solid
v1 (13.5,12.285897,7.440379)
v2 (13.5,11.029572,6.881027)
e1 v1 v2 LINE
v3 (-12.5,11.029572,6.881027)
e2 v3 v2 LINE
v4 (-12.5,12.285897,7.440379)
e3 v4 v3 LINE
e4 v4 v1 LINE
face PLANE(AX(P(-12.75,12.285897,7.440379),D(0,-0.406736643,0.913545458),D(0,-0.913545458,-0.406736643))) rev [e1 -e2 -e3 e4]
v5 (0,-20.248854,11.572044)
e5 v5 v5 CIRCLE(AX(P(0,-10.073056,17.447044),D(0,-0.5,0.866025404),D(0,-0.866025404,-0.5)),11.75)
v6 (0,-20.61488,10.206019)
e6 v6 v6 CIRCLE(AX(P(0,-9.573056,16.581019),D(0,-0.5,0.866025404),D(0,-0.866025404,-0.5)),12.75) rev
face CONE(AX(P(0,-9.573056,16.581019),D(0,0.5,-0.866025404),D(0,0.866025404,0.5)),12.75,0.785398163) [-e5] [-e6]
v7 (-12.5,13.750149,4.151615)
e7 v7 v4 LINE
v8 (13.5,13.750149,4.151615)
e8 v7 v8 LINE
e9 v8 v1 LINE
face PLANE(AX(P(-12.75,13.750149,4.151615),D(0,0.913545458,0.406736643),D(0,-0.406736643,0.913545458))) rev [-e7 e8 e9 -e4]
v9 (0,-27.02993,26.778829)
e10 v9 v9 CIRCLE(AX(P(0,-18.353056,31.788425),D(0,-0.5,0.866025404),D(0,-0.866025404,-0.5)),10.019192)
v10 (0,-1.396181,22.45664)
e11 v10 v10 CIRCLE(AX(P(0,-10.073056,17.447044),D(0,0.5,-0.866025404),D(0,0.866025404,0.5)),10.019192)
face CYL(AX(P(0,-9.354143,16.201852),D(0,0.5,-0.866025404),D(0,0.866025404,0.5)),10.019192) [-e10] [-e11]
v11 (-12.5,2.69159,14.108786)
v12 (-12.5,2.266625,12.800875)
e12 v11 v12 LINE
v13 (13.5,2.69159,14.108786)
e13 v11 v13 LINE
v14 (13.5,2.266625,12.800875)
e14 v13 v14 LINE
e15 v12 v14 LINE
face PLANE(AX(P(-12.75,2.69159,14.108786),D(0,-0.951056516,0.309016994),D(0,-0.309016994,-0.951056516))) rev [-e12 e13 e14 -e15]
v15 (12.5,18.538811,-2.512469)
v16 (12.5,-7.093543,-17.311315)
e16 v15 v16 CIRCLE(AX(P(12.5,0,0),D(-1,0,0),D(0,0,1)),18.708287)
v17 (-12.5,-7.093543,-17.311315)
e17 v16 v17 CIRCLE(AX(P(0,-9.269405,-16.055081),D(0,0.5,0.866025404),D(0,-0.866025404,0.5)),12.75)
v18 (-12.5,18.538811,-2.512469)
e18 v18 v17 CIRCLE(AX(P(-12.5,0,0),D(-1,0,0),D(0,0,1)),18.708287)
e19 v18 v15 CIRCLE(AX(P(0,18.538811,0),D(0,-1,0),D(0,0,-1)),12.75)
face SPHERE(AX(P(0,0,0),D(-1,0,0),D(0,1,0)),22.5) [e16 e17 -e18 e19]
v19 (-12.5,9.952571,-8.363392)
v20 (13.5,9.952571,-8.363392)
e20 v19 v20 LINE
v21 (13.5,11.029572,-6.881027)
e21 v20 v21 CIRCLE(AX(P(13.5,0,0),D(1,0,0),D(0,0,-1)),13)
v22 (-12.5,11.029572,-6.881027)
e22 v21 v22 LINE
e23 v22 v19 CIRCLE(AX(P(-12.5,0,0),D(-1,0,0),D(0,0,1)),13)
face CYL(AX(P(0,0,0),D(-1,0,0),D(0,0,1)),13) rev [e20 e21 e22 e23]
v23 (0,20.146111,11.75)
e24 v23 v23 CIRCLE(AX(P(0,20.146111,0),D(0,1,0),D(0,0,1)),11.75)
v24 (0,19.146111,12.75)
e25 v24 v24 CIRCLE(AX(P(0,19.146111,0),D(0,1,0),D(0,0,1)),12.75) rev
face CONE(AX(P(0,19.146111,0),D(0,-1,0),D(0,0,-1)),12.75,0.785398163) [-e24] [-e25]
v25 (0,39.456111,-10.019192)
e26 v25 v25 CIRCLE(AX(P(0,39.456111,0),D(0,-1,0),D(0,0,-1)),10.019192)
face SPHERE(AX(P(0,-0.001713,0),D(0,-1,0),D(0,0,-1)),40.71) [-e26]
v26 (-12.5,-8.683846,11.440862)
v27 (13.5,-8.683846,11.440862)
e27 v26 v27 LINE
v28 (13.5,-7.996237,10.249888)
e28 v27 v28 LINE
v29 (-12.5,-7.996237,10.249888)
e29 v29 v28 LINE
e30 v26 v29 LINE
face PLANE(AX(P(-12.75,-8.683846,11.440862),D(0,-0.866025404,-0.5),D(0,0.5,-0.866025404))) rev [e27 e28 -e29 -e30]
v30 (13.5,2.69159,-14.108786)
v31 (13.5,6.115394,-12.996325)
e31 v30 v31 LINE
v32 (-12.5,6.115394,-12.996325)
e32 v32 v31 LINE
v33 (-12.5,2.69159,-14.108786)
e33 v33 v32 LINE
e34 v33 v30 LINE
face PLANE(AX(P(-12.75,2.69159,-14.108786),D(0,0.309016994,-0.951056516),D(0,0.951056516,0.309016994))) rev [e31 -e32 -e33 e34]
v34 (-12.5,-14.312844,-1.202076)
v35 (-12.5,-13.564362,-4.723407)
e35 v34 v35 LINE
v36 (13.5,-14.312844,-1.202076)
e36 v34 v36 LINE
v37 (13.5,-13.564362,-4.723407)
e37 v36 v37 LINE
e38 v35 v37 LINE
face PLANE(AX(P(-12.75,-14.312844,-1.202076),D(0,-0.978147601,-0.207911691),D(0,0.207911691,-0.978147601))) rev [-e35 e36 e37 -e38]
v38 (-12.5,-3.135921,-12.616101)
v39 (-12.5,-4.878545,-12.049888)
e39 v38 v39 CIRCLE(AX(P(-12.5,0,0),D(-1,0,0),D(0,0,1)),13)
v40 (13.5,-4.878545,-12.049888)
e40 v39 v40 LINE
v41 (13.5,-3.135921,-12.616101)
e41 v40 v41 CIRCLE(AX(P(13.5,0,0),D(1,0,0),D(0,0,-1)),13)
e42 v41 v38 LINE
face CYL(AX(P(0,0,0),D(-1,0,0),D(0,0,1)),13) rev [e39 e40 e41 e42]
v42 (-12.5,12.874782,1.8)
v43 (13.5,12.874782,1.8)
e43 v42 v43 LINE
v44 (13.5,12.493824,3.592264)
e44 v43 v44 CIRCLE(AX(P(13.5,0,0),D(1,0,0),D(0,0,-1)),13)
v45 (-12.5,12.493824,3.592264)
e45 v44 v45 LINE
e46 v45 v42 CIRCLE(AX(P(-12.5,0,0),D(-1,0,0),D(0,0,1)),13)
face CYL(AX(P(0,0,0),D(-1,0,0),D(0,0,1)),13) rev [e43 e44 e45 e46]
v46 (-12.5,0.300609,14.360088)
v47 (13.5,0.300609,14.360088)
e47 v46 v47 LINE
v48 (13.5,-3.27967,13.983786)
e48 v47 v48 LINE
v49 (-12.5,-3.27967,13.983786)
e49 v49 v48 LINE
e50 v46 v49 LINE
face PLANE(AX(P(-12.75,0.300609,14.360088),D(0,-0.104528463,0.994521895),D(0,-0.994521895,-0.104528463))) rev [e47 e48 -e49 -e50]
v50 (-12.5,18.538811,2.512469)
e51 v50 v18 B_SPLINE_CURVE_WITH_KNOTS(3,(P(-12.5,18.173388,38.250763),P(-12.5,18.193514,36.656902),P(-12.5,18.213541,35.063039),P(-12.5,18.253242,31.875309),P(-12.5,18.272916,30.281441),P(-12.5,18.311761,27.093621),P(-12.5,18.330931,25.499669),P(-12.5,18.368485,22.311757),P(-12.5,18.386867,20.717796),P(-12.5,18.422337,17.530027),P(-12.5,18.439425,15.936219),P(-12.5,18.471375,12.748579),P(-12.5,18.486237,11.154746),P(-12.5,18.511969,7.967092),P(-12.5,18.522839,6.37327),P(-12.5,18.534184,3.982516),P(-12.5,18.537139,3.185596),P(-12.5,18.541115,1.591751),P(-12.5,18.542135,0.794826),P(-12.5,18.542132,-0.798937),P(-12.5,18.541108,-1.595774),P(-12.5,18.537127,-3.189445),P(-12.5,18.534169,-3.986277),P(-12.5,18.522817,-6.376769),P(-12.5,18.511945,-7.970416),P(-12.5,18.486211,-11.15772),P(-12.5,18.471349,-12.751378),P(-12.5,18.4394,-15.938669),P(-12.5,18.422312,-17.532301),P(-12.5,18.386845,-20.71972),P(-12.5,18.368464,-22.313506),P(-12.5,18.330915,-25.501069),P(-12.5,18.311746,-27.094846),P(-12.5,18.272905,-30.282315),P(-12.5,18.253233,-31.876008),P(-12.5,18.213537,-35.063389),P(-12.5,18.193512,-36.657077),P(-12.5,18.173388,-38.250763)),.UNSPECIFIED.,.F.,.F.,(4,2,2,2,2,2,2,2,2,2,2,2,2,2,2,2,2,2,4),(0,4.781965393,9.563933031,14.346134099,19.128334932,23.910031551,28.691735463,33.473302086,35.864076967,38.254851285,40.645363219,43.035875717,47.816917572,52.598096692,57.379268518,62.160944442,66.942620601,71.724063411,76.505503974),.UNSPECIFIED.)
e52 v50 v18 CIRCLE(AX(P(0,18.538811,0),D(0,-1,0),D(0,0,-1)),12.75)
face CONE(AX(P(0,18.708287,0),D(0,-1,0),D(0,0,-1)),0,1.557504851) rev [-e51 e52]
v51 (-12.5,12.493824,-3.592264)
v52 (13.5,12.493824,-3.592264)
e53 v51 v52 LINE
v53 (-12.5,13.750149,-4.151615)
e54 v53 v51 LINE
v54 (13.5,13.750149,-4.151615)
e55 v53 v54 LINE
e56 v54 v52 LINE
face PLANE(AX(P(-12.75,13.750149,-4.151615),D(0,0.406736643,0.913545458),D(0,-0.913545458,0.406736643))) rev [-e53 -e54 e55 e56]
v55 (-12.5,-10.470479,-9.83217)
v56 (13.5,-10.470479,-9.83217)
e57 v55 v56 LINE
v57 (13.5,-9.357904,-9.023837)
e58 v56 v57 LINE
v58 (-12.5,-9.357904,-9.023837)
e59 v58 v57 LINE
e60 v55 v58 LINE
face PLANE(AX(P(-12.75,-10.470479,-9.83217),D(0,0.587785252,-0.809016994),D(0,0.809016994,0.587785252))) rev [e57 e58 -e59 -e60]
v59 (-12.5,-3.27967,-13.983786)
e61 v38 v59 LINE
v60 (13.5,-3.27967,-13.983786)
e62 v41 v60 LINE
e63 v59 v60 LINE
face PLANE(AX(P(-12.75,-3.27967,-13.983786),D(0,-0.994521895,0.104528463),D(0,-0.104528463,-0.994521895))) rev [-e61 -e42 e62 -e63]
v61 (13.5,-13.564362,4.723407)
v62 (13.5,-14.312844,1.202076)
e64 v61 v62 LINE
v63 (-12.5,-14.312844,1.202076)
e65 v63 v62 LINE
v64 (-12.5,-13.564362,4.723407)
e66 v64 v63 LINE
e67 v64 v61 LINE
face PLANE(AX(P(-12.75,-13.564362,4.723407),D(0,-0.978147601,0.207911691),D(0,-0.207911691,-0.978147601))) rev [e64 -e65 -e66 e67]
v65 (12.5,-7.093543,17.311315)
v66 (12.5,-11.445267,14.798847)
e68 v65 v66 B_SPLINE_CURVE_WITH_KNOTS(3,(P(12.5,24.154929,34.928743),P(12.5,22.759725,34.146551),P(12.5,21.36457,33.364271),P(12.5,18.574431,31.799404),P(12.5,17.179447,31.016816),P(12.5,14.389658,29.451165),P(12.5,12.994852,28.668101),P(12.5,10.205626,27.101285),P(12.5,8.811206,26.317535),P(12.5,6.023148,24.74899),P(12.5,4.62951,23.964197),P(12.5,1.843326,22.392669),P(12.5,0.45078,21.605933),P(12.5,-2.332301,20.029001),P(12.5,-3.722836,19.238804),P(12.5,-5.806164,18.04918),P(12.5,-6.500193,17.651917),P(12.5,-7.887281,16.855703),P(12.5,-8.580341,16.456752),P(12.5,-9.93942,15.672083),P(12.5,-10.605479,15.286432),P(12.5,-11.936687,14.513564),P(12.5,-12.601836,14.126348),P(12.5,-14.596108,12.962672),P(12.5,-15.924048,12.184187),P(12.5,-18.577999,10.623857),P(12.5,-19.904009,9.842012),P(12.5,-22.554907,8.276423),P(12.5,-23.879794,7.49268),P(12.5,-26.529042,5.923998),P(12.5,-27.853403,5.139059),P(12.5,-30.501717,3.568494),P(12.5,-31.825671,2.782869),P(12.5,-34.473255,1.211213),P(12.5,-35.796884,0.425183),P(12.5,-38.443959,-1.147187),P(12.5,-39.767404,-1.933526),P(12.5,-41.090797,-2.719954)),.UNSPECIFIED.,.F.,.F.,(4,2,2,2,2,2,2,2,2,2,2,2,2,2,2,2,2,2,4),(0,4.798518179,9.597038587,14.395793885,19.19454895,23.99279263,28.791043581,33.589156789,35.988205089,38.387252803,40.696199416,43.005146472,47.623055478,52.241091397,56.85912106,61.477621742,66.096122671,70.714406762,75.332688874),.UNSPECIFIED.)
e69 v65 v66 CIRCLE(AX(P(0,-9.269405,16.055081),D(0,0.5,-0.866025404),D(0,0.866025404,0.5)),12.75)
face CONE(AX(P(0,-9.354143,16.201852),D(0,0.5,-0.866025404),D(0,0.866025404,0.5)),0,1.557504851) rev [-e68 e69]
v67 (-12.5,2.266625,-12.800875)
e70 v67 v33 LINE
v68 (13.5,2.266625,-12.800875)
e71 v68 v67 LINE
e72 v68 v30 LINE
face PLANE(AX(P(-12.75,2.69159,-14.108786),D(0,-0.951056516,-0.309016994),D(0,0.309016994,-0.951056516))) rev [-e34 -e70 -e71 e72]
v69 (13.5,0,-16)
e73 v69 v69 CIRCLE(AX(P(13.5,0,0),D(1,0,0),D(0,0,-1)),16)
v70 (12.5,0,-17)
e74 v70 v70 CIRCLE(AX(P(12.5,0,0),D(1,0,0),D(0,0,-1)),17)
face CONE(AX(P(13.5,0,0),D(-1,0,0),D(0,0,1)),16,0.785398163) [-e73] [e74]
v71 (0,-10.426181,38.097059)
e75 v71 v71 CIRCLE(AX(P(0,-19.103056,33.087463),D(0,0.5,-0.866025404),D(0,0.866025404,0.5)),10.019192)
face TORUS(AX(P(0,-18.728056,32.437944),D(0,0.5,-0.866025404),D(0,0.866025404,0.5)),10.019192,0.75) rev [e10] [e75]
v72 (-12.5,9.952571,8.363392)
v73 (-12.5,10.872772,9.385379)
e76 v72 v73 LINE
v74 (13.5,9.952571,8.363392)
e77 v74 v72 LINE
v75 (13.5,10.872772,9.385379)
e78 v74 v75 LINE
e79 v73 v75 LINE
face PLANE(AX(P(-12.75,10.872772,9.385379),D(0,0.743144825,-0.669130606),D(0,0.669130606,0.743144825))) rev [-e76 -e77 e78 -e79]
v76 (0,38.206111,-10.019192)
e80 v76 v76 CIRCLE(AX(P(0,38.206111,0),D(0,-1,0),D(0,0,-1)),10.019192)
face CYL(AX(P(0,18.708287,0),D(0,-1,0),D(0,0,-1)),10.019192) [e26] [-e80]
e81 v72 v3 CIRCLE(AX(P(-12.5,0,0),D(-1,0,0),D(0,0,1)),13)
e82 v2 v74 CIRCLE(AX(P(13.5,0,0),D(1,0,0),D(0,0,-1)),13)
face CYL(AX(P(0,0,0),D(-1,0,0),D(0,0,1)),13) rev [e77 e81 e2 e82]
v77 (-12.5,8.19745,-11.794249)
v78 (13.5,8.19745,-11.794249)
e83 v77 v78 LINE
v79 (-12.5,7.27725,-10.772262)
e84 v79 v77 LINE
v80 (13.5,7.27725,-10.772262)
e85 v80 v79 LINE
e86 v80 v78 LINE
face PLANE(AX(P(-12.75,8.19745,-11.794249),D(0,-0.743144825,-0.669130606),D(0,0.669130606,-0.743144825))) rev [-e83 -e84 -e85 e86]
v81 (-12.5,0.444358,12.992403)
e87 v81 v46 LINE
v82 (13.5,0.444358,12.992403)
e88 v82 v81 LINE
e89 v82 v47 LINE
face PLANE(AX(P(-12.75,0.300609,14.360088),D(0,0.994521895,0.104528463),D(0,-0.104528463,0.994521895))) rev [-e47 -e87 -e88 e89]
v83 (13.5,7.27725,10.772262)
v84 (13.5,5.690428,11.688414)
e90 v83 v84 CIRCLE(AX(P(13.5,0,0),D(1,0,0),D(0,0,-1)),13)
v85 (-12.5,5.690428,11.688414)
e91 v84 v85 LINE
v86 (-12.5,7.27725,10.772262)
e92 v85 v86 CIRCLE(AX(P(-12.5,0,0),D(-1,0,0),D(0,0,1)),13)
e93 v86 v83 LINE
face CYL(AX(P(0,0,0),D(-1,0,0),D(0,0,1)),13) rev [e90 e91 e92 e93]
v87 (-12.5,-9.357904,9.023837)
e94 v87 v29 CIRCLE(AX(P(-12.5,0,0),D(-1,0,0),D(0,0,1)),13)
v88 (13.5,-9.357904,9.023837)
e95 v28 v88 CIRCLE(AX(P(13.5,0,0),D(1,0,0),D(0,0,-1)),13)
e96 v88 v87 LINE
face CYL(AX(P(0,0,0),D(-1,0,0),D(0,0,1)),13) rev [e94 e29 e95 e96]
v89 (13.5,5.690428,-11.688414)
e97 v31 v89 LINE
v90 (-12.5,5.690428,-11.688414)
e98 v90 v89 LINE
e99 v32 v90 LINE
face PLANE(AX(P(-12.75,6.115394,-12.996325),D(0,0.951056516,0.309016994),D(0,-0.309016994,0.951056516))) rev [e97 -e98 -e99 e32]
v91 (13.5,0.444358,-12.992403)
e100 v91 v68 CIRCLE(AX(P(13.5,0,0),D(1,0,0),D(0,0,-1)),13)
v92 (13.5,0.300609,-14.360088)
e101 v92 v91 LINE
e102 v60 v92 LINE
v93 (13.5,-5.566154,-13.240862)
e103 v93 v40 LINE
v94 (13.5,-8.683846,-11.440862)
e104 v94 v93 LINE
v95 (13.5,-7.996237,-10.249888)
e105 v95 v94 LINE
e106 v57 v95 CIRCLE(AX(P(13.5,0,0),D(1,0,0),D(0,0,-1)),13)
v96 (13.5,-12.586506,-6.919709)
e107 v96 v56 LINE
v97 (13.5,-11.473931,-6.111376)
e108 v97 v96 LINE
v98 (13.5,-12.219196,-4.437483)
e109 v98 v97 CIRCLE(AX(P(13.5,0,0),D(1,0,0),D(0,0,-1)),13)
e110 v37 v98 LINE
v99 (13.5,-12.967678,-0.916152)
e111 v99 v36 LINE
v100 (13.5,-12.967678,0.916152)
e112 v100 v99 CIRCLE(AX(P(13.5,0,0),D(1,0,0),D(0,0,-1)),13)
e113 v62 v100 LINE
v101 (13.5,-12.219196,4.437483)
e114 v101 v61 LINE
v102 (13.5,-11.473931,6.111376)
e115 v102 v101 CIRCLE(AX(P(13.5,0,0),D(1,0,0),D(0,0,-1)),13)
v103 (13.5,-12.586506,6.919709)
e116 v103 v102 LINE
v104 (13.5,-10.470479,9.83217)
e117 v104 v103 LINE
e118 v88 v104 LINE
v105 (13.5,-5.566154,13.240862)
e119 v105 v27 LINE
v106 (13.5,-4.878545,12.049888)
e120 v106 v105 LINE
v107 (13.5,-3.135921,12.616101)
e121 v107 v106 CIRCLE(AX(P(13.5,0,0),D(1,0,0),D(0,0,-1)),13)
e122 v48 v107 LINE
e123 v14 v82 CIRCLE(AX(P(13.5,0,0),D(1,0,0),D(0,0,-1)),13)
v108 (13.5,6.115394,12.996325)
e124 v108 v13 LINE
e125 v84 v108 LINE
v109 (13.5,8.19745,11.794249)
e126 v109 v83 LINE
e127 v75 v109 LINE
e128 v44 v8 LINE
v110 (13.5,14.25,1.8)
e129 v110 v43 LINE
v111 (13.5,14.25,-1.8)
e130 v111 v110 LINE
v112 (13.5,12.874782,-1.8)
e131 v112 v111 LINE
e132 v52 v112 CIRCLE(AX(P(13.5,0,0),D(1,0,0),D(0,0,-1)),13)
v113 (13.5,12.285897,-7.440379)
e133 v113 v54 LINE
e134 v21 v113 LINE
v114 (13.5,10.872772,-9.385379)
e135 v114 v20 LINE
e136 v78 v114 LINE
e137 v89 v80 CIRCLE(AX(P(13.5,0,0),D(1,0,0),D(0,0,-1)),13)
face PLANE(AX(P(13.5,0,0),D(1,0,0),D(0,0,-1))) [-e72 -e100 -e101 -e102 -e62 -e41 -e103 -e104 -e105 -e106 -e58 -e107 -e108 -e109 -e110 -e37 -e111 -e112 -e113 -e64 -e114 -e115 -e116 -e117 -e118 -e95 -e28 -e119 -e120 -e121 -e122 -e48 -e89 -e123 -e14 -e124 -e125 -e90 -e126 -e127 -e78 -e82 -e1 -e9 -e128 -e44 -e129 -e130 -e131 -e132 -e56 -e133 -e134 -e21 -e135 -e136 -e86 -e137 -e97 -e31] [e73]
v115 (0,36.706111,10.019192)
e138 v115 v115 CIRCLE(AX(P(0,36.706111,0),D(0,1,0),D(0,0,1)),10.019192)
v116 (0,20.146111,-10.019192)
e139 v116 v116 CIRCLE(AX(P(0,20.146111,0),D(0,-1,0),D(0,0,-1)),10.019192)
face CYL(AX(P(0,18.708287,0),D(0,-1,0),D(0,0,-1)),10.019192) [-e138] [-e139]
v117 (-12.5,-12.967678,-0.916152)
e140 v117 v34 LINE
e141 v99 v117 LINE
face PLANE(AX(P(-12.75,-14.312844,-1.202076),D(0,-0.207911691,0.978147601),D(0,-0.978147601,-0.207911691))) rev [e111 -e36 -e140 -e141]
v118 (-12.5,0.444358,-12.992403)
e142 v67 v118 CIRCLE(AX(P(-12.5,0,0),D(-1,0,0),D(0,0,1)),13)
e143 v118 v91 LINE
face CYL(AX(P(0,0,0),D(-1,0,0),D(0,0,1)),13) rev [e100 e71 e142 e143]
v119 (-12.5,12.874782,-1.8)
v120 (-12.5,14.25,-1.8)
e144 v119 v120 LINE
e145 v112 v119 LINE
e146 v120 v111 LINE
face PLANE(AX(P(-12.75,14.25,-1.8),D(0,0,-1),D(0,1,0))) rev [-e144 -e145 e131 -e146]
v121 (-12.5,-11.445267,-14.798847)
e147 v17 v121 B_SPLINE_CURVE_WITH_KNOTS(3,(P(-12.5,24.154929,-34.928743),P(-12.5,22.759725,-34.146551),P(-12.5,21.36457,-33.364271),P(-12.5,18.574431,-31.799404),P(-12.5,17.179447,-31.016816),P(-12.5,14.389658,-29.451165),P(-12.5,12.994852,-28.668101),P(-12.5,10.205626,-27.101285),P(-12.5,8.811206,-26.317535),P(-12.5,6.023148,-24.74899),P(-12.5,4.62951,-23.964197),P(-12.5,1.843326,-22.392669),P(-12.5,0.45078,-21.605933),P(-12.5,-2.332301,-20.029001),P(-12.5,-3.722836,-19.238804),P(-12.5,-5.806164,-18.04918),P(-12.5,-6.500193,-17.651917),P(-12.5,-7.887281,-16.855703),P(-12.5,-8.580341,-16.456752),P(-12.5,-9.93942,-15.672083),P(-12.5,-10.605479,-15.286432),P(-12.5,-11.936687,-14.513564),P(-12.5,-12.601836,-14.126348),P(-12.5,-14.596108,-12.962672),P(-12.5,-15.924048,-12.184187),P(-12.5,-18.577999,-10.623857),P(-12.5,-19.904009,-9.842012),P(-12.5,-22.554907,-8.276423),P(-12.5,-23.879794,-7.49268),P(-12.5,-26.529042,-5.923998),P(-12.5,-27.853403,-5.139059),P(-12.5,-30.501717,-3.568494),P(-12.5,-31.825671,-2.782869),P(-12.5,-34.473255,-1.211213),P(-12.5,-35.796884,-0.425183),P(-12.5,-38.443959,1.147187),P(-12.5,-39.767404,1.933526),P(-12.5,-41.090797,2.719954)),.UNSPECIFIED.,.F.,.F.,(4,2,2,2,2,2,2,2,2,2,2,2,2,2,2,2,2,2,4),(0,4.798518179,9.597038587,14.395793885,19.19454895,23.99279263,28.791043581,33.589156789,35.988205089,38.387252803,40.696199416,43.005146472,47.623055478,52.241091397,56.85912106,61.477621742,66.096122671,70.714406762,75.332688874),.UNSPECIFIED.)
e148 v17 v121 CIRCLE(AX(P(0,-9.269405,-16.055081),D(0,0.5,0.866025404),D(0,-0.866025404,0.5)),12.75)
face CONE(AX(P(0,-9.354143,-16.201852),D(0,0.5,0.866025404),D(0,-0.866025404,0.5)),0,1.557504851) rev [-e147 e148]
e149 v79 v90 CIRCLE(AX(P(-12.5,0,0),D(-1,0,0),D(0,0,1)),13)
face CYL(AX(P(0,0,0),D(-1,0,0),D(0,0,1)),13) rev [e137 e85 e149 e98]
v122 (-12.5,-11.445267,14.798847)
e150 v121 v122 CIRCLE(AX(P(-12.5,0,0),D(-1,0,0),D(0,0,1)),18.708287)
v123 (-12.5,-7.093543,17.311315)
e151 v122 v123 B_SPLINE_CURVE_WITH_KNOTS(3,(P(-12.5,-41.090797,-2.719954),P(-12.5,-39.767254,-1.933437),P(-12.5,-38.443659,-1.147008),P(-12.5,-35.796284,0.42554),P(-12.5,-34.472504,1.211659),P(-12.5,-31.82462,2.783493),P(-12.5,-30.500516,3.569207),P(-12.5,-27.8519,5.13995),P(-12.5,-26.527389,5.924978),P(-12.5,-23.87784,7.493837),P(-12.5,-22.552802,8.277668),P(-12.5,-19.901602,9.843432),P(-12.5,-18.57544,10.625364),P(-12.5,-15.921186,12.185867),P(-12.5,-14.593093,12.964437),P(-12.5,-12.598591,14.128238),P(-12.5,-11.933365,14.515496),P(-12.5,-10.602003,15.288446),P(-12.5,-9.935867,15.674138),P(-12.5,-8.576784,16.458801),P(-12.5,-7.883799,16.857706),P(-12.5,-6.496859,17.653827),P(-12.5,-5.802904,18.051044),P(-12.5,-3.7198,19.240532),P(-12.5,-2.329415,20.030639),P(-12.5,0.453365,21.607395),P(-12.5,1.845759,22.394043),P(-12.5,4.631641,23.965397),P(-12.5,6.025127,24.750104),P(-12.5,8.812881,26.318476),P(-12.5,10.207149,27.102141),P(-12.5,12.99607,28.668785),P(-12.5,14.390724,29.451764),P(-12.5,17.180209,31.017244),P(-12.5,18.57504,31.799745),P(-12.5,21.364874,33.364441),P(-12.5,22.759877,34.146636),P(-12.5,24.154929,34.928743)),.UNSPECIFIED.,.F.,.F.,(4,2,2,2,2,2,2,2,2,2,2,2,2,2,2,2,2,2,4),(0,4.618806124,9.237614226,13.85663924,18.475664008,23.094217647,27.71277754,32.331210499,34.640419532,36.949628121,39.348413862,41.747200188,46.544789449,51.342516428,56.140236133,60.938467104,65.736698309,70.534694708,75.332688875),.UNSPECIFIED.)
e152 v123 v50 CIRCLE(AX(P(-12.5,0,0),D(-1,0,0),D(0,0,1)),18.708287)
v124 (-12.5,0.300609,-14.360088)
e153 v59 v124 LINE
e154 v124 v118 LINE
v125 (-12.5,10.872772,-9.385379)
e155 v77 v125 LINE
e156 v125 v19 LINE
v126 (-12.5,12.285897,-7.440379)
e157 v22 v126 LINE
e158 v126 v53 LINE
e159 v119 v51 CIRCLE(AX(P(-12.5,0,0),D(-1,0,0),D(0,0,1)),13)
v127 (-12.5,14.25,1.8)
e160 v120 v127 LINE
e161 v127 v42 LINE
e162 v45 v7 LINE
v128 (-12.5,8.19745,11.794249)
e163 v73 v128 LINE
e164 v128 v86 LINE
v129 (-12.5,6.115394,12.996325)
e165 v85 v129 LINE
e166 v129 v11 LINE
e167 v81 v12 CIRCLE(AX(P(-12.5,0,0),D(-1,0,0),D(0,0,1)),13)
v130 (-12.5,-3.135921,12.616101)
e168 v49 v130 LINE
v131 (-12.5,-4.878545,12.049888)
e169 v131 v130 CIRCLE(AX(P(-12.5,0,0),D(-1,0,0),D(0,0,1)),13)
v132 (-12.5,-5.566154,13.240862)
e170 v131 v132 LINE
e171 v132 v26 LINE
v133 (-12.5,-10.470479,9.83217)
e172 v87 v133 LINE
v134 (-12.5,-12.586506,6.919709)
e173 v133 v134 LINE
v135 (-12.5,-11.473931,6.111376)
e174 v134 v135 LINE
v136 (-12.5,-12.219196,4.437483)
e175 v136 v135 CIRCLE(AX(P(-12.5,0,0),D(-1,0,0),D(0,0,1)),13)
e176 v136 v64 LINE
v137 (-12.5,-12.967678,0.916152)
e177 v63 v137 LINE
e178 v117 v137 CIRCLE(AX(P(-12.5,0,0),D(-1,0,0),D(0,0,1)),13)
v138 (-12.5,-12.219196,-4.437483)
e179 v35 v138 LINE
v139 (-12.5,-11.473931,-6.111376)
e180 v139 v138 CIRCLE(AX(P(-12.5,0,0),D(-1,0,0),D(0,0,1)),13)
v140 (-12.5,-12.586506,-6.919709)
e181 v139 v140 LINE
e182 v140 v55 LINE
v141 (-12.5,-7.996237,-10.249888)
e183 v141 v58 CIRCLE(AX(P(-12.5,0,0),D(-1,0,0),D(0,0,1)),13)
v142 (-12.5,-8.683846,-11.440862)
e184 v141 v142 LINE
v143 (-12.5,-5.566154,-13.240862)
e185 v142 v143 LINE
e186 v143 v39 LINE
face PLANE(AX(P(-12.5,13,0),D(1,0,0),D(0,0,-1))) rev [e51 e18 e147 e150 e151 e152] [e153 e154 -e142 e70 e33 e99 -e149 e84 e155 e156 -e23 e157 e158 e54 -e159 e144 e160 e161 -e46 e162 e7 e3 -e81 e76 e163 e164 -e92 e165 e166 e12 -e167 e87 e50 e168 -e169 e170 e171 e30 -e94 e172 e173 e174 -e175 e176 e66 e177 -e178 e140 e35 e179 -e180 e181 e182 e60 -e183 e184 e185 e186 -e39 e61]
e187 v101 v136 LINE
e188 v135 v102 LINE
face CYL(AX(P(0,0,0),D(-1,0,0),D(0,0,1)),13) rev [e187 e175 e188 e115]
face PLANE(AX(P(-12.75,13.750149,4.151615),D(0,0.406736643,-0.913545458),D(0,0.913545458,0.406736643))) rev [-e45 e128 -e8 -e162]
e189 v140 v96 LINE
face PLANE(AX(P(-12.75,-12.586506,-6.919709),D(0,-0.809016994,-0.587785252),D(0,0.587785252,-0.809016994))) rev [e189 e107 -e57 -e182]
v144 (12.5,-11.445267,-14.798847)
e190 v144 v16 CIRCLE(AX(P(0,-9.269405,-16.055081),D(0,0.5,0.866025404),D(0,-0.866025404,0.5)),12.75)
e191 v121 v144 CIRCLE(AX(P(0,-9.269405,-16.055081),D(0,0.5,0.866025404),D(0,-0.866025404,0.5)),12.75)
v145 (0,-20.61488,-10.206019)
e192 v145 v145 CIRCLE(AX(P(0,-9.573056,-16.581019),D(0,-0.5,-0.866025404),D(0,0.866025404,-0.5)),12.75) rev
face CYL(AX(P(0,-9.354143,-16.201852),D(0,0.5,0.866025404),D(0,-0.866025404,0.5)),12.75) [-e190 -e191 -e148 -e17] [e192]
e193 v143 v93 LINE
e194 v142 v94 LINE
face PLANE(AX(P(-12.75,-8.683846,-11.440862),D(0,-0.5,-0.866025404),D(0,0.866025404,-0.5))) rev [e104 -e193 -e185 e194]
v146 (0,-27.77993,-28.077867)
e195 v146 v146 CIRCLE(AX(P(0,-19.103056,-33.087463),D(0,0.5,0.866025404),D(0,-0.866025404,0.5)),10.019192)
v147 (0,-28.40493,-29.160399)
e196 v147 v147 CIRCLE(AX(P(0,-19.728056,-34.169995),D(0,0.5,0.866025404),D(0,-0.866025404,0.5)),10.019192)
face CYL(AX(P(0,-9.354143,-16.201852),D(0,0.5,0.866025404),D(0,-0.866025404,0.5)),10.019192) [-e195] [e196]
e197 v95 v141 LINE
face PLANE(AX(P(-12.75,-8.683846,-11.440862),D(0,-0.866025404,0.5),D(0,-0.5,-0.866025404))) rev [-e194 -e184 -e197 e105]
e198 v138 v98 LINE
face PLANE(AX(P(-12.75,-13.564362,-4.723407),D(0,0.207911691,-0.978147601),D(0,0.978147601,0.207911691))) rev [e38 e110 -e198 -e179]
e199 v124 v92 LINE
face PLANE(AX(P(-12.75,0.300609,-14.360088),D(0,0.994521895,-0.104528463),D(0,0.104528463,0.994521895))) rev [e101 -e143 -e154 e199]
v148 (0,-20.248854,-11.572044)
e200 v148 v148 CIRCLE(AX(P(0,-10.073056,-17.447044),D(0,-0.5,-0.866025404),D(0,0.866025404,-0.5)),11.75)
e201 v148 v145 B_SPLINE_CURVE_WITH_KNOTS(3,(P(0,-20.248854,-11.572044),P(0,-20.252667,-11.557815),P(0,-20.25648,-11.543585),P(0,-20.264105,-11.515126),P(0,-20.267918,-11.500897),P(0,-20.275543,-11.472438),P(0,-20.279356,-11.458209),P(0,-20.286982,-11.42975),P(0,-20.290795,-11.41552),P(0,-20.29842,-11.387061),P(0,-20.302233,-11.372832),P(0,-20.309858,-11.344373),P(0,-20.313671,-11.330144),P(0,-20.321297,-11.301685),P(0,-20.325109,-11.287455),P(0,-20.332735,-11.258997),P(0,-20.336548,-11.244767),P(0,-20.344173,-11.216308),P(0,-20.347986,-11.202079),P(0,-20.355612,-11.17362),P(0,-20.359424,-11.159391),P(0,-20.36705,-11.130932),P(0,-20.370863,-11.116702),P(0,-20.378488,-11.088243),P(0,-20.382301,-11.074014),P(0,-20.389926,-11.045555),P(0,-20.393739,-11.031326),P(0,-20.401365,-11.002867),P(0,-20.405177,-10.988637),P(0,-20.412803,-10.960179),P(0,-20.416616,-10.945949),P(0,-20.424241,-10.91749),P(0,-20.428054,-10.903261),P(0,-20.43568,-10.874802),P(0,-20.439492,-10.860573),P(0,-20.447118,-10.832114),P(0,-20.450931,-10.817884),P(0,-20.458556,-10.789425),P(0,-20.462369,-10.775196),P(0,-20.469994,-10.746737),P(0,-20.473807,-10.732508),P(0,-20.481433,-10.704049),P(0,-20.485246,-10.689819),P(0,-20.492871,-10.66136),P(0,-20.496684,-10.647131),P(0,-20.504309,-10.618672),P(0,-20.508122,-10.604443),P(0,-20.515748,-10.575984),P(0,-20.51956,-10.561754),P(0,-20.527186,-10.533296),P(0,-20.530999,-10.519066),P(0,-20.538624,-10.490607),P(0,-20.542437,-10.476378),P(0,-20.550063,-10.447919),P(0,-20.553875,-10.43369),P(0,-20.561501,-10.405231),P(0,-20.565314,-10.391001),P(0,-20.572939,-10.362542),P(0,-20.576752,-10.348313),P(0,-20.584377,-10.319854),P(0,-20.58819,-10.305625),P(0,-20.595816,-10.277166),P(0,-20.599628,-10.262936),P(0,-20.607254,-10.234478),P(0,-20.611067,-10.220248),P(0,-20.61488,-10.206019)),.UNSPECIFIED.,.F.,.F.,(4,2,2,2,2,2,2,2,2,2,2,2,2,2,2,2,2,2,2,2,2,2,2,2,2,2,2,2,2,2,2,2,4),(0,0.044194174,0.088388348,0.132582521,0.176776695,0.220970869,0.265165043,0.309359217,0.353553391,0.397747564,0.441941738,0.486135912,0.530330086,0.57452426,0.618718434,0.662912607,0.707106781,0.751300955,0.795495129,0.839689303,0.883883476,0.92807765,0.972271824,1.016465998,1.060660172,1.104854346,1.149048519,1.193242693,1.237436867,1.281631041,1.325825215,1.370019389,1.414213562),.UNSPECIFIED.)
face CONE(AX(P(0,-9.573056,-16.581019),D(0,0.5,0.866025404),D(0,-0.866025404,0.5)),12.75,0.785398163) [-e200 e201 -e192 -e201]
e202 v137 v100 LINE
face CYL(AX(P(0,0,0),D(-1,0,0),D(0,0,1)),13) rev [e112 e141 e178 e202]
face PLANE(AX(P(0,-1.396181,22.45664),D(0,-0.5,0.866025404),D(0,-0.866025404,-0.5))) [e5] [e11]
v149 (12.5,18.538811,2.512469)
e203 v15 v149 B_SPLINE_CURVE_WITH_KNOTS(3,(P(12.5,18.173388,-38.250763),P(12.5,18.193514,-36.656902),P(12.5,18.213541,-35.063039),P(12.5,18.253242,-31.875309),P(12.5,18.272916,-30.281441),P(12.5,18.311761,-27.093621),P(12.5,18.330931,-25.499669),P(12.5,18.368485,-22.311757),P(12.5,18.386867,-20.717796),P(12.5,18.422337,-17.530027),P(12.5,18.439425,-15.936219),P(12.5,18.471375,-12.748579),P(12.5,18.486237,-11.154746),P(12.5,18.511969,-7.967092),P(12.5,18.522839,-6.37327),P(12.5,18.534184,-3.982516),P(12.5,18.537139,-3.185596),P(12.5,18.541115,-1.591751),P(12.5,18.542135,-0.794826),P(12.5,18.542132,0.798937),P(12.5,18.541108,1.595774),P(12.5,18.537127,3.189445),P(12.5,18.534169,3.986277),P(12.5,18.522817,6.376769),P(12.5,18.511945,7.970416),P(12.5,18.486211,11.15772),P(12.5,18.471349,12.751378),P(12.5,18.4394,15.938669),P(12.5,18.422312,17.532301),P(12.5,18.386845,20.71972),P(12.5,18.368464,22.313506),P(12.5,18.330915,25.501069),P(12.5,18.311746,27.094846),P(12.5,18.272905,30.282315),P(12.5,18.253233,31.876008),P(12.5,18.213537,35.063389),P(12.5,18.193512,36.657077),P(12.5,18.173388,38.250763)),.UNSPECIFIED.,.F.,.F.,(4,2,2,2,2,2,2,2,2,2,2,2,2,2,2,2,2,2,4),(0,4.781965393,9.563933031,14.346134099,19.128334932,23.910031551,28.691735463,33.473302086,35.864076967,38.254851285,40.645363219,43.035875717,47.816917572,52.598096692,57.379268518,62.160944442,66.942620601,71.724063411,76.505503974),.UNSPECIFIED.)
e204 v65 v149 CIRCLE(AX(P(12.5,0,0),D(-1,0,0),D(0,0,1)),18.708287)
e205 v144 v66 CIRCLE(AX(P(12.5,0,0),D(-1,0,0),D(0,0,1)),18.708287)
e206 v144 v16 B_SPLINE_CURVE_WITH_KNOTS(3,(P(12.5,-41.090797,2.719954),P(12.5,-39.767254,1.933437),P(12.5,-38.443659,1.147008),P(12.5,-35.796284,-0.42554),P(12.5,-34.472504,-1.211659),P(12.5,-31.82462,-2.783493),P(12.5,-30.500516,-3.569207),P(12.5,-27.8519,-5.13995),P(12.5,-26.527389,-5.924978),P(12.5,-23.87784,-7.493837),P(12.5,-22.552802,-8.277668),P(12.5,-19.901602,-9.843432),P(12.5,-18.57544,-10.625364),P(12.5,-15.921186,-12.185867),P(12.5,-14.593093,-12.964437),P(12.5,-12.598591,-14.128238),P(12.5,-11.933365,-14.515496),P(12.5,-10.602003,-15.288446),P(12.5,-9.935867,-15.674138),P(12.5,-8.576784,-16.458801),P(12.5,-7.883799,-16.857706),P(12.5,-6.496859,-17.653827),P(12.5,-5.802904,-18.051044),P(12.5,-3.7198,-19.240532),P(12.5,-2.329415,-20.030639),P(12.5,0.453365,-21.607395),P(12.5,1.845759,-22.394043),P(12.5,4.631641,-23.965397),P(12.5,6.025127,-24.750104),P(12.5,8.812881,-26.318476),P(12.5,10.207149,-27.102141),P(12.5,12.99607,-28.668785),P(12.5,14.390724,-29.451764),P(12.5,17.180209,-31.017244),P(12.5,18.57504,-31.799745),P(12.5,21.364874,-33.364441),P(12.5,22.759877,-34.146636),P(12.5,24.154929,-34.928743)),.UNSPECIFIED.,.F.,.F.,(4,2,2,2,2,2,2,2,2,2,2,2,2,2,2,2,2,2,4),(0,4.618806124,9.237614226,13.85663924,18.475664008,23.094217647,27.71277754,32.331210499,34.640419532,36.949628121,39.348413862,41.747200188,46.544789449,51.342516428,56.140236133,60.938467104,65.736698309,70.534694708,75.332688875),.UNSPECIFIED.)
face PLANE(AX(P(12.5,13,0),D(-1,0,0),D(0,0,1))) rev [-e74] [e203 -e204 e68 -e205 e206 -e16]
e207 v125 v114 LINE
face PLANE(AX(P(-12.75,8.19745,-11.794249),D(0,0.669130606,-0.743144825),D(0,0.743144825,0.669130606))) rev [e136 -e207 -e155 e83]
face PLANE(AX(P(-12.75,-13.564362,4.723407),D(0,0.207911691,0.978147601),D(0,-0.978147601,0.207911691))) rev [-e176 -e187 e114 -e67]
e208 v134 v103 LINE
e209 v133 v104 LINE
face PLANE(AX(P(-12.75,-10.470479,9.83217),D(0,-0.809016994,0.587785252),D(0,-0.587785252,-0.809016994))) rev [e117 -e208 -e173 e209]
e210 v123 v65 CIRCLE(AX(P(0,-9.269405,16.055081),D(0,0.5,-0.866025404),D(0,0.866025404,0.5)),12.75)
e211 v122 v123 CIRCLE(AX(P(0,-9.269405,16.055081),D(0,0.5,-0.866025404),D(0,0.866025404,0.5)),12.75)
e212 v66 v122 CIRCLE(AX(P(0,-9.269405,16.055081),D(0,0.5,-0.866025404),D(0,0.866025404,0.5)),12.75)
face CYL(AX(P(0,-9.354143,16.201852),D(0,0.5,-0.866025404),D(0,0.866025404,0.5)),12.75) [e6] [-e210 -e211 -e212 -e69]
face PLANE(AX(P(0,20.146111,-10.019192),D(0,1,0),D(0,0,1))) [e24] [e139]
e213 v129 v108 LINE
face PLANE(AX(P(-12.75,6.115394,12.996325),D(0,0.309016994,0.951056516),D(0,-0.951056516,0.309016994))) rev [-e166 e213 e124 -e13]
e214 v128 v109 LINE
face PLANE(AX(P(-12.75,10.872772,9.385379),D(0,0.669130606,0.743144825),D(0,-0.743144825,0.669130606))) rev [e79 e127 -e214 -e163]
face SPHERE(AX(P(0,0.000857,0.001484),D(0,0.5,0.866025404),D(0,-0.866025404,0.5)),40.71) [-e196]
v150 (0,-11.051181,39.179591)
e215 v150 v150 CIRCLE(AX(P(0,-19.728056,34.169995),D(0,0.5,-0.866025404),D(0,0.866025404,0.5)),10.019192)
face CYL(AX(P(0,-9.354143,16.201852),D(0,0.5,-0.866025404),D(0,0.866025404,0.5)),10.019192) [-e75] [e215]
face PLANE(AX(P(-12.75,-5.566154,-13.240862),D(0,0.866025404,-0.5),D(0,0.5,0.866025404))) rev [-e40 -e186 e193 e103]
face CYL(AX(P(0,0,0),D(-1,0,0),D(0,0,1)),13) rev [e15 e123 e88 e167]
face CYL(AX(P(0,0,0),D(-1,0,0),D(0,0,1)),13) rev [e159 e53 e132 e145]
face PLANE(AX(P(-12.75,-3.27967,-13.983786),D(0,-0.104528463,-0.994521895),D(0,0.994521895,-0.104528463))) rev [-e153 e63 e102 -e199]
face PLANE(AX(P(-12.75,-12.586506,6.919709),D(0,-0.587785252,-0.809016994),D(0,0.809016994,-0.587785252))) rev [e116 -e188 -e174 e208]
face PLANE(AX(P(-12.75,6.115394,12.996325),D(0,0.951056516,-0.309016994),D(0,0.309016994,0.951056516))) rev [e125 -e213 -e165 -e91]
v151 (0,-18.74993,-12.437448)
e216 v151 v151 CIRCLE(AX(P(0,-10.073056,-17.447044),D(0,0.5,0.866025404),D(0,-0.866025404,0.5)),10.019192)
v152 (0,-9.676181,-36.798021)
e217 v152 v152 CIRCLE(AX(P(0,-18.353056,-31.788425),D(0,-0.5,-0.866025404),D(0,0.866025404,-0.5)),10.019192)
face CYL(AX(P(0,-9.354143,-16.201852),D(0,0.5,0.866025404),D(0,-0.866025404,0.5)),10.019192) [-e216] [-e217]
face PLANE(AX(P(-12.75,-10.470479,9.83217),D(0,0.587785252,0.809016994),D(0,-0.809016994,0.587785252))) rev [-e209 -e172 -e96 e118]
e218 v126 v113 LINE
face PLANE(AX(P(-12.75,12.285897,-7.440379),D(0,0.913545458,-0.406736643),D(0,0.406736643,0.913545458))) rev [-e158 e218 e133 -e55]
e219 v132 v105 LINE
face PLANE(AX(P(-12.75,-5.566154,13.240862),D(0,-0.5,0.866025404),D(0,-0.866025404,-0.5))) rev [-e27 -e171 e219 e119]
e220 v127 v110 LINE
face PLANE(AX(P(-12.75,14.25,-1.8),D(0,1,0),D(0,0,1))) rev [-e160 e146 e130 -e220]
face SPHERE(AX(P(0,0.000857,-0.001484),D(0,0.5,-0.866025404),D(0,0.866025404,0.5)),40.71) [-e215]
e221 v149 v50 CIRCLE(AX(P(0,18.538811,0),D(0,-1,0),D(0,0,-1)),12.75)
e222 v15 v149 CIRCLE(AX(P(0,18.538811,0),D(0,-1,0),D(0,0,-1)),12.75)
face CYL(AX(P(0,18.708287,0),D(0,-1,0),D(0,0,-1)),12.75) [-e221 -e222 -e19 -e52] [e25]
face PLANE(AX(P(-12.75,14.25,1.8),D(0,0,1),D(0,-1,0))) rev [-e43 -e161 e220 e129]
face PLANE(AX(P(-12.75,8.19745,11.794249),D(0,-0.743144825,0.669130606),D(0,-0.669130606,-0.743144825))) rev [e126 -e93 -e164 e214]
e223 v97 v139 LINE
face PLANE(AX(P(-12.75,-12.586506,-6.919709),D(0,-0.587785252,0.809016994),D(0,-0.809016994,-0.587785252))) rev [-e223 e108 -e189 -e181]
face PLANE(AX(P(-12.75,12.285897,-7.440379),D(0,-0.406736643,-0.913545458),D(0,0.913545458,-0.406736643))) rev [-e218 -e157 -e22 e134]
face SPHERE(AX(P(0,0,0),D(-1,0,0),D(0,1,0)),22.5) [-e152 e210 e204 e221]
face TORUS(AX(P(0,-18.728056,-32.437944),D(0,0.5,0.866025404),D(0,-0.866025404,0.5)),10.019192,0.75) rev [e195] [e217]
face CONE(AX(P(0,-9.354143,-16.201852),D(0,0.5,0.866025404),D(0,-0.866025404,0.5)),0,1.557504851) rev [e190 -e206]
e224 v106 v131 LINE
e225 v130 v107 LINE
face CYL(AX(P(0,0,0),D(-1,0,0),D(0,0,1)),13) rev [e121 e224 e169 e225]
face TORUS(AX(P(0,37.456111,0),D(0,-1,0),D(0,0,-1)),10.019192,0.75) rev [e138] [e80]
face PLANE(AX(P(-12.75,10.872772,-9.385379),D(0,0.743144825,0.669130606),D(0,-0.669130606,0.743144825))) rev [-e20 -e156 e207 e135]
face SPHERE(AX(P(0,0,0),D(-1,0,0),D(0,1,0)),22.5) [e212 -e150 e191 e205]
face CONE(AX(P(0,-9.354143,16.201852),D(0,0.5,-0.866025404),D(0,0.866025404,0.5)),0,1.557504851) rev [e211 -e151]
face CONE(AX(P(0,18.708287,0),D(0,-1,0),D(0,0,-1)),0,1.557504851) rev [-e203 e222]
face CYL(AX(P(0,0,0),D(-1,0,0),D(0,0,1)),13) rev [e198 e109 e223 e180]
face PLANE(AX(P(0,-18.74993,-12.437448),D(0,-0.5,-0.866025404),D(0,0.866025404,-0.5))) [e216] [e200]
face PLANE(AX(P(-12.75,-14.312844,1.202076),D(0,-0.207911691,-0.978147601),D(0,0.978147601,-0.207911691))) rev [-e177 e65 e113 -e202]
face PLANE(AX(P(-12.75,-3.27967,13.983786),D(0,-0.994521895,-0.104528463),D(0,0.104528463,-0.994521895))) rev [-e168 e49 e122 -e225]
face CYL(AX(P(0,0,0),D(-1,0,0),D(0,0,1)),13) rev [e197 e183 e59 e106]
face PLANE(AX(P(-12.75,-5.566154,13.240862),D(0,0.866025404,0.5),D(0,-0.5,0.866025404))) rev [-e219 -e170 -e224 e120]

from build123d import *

# Parameters (mm, degrees)
BOSS_EXTRUDE1_START          = 1
SKETCH3_R                    = 17
SKETCH3_R_2                  = 13
BOSS_EXTRUDE1_DEPTH          = 1
CHAMFER1_SIZE                = 1
CHAMFER2_SIZE                = 1
SKETCH8_R                    = 0.75
CIRPATTERN2_COUNT            = 3
CHAMFER2_OF_CIRPATTERN2_SIZE = 1
SKETCH9_W                    = 3.6
SKETCH9_H                    = 2
CUT_EXTRUDE1_DEPTH           = 63.299818922
CIRPATTERN3_COUNT            = 15


with BuildPart() as part:
    # Sketch1 → Revolve1 (revolve)
    with BuildSketch(Plane.XY, mode=Mode.PRIVATE) as revolve1_sk:
        with BuildLine():
            Line((12.5, 13), (12.5, 18.708286934))
            ThreePointArc((12.5, 18.708286934), (0, 22.5), (-12.5, 18.708286934))
            Line((-12.5, 18.708286934), (-12.5, 13))
            Line((-12.5, 13), (12.5, 13))
        make_face()
    revolve(revolve1_sk.sketch.rotate(Axis((0, 0, 0), (1, 0, 0)), 90), axis=Axis((0, 0, 0), (1, 0, 0)))

    # Sketch3 → Boss-Extrude1 (add)
    with BuildSketch(Plane(origin=(12.5, 0, 0), x_dir=(0, 0, -1), z_dir=(1, 0, 0)).offset(BOSS_EXTRUDE1_START)):
        Circle(SKETCH3_R)
        with Locations(Location((0, 0, 0), (0, 0, 180))):
            Circle(SKETCH3_R_2, mode=Mode.SUBTRACT)
    extrude(amount=-BOSS_EXTRUDE1_DEPTH)

    # Chamfer1
    chamfer1_edges = [part.edges().sort_by_distance(p)[0] for p in [
        (13.5, 0, 17),
    ]]
    chamfer(chamfer1_edges, length=CHAMFER1_SIZE - 0.0001)  # a hair under: the kernel refuses the full size

    # Sketch7 → Revolve2 (revolve)
    with BuildSketch(Plane(origin=(0, 0, 0), x_dir=(0, 0, -1), z_dir=(1, 0, 0))):
        with BuildLine():
            Line((0, 18.708286934), (0, 40.708286934))
            ThreePointArc((0, 40.708286934), (5.048567788, 40.394030067), (10.019191725, 39.456111217))
            Line((10.019191725, 39.456111217), (10.019191725, 20.146111217))
            Line((10.019191725, 20.146111217), (12.75, 20.146111217))
            Line((12.75, 20.146111217), (12.75, 18.538810641))
            Line((12.75, 18.538810641), (0, 18.708286934))
        make_face()
    revolve2 = revolve(axis=Axis((0, 18.708286934, 0), (0, 1, 0)))

    # Chamfer2
    chamfer2_edges = [part.edges().sort_by_distance(p)[0] for p in [
        (0, 20.146111217, 12.75),
    ]]
    chamfer(chamfer2_edges, length=CHAMFER2_SIZE)

    # Sketch8 → Cut-Revolve1 (revolve, cut)
    with BuildSketch(Plane(origin=(0, 0, 0), x_dir=(0, 0, -1), z_dir=(1, 0, 0))):
        with Locations((10.019191725, 37.456111217)):
            Circle(SKETCH8_R)
    cut_revolve1 = revolve(axis=Axis((0, 20.146111217, 0), (0, 1, 0)), mode=Mode.SUBTRACT)

    # CirPattern2: Revolve2, Cut-Revolve1 ×3 about axis
    cirpattern2_axis = Axis((0, 0, 0), (1, 0, 0))
    add([revolve2.rotate(cirpattern2_axis, i * 360 / CIRPATTERN2_COUNT) for i in range(1, CIRPATTERN2_COUNT)])
    add([cut_revolve1.rotate(cirpattern2_axis, i * 360 / CIRPATTERN2_COUNT) for i in range(1, CIRPATTERN2_COUNT)], mode=Mode.SUBTRACT)

    # Chamfer2 of CirPattern2
    chamfer2_of_cirpattern2_edges = [part.edges().sort_by_distance(p)[0] for p in [
        (0, -21.114879507, 11.072044102),
        (0, 0.96876829, -23.822044102),
    ]]
    chamfer(chamfer2_of_cirpattern2_edges, length=CHAMFER2_OF_CIRPATTERN2_SIZE)

    # Sketch9 → Cut-Extrude1 (cut, through all)
    with BuildSketch(Plane(origin=(13.5, 0, 0), x_dir=(0, 0, -1), z_dir=(1, 0, 0))):
        with Locations((0, 13.25)):
            Rectangle(SKETCH9_W, SKETCH9_H)
    cut_extrude1 = extrude(amount=-CUT_EXTRUDE1_DEPTH, mode=Mode.SUBTRACT)

    # CirPattern3: Cut-Extrude1 ×15 about axis
    cirpattern3_axis = Axis((0, 0, 0), (1, 0, 0))
    for i in range(1, CIRPATTERN3_COUNT):
        add(cut_extrude1.rotate(cirpattern3_axis, i * 360 / CIRPATTERN3_COUNT), mode=Mode.SUBTRACT)


solid = part.part
